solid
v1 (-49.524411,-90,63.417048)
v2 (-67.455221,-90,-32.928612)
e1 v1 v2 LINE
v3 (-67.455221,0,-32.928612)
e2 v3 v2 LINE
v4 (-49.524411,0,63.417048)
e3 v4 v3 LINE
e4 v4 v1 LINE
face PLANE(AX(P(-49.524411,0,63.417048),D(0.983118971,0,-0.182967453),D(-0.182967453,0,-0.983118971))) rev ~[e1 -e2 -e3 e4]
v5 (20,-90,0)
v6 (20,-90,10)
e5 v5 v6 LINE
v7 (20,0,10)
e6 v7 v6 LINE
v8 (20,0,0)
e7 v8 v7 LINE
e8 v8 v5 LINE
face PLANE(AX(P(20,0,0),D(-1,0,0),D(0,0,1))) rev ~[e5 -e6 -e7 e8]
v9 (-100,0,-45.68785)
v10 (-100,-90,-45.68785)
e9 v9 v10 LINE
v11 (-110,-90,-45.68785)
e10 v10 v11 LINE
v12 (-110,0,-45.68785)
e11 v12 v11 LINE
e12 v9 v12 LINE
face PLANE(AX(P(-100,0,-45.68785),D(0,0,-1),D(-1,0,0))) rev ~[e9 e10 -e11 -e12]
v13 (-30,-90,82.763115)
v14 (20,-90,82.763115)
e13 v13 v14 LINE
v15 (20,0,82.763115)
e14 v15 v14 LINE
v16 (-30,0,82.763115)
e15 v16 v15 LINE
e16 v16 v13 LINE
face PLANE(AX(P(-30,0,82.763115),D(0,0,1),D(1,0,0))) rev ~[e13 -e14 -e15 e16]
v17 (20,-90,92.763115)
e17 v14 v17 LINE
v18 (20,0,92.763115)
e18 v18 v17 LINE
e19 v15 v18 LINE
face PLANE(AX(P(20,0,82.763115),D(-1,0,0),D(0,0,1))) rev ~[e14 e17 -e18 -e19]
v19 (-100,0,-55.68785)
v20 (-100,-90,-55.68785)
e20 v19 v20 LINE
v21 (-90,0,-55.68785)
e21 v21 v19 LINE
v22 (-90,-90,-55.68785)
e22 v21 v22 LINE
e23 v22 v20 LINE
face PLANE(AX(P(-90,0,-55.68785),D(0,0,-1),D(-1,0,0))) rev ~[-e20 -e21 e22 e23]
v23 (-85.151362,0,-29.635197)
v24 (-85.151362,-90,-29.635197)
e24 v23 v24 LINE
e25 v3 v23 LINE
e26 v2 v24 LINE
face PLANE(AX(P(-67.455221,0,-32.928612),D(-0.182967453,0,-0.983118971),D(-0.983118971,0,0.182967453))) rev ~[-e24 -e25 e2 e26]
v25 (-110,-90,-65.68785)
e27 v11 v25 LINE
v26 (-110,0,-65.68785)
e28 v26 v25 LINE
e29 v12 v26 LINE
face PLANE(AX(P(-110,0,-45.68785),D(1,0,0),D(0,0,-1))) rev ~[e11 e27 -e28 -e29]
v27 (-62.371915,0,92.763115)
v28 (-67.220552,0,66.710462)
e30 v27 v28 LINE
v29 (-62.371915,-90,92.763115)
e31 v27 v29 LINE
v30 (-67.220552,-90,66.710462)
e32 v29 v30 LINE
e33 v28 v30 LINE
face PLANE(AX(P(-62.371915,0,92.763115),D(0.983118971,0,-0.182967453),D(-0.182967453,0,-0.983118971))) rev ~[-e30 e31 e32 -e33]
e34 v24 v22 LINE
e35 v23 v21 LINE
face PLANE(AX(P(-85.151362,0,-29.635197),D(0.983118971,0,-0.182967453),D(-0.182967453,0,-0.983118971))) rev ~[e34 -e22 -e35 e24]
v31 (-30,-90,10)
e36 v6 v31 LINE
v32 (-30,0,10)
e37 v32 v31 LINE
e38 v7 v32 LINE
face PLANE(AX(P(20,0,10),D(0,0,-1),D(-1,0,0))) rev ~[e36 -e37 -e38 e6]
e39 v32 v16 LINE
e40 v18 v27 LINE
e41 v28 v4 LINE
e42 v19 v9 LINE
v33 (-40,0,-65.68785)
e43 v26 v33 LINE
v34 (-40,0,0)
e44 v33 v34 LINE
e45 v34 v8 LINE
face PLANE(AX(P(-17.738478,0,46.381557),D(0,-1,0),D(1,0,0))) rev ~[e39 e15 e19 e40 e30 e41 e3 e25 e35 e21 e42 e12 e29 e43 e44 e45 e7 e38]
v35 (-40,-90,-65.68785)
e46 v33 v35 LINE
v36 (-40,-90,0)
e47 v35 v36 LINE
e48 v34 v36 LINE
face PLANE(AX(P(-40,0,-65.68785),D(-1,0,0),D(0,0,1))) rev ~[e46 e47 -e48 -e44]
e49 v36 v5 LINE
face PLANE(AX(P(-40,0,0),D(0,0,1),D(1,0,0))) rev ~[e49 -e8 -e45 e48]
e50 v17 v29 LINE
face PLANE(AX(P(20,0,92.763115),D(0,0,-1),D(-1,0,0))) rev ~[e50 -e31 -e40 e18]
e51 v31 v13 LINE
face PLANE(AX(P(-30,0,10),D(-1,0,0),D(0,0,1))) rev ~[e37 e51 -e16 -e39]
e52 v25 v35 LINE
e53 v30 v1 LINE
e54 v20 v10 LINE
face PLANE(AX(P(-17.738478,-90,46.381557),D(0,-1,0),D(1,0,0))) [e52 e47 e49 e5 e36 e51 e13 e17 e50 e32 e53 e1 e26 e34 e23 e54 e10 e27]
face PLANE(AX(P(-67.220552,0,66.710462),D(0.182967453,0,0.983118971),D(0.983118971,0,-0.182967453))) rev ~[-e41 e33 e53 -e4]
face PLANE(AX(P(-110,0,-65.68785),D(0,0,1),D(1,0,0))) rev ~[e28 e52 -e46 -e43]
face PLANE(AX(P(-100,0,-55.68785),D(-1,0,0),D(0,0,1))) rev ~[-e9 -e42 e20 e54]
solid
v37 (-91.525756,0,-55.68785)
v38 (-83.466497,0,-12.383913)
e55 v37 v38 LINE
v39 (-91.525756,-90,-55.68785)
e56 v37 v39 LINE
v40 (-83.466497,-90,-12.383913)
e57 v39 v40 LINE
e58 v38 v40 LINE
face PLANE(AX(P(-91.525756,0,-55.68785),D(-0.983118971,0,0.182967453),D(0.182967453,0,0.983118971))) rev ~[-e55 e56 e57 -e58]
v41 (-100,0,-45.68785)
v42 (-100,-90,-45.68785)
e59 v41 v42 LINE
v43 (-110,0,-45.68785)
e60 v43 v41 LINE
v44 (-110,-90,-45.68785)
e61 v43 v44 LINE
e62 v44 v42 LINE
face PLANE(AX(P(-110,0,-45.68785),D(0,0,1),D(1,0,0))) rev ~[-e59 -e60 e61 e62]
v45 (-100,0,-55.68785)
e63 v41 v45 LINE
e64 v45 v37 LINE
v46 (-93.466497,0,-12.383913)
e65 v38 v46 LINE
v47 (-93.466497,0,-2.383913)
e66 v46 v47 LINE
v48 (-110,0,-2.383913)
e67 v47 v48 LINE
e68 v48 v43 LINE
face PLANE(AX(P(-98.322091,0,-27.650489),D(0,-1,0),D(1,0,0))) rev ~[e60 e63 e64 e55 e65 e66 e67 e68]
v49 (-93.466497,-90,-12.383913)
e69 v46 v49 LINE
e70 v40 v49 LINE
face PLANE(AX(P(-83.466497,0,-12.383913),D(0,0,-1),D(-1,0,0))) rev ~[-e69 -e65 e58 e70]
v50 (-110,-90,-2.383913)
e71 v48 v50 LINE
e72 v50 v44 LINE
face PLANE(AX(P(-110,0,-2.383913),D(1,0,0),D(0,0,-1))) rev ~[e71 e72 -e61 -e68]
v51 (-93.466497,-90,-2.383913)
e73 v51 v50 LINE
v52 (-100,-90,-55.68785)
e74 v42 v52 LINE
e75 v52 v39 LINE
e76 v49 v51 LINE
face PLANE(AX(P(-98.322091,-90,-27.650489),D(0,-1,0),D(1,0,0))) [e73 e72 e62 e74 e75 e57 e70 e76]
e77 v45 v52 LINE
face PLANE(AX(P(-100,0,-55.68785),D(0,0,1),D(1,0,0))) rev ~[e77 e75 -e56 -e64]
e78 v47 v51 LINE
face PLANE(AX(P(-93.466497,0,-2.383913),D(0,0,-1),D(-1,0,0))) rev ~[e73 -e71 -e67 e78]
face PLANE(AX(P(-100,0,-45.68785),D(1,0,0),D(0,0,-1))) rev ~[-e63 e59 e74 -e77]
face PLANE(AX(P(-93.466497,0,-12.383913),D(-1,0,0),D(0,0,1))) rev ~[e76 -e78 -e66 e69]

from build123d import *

# Parameters (mm, degrees)
F1_DEPTH = 90
F2_DEPTH = 90


# Not quite as in the source:
# - a feature names something its author has since deleted; it is built from what else it names


with BuildPart() as f1:
    # F0 (on Front) → F1 (new body)
    with BuildSketch(Plane.XZ):
        Polygon((-40, 92.7631145057), (-40, 0), (20, 0), (20, 10), (-30, 10), (-30, 82.7631145057), (20, 82.7631145057), (20, 92.7631145057), align=None)
        Polygon((-40, -65.6878501177), (-40, 0), (-40, 92.7631145057), (-62.3719146089, 92.7631145057), (-67.2205521113, 66.7104617738), (-49.5244106331, 63.4170476212), (-58.4898158262, 15.2442180415), (-67.4552210193, -32.9286115383), (-85.1513624976, -29.6351973858), (-90, -55.6878501177), (-91.5257563369, -55.6878501177), (-100, -55.6878501177), (-100, -45.6878501177), (-110, -45.6878501177), (-110, -65.6878501177), align=None)
    extrude(amount=F1_DEPTH)


with BuildPart() as f2:
    # F0 (on Front) → F2 (new body)
    with BuildSketch(Plane.XZ):
        Polygon((-110, -2.3839132024), (-110, -45.6878501177), (-100, -45.6878501177), (-100, -55.6878501177), (-91.5257563369, -55.6878501177), (-83.4664967026, -12.3839132024), (-93.4664967026, -12.3839132024), (-93.4664967026, -2.3839132024), align=None)
    extrude(amount=F2_DEPTH)


solid = Compound([f1.part, f2.part])
